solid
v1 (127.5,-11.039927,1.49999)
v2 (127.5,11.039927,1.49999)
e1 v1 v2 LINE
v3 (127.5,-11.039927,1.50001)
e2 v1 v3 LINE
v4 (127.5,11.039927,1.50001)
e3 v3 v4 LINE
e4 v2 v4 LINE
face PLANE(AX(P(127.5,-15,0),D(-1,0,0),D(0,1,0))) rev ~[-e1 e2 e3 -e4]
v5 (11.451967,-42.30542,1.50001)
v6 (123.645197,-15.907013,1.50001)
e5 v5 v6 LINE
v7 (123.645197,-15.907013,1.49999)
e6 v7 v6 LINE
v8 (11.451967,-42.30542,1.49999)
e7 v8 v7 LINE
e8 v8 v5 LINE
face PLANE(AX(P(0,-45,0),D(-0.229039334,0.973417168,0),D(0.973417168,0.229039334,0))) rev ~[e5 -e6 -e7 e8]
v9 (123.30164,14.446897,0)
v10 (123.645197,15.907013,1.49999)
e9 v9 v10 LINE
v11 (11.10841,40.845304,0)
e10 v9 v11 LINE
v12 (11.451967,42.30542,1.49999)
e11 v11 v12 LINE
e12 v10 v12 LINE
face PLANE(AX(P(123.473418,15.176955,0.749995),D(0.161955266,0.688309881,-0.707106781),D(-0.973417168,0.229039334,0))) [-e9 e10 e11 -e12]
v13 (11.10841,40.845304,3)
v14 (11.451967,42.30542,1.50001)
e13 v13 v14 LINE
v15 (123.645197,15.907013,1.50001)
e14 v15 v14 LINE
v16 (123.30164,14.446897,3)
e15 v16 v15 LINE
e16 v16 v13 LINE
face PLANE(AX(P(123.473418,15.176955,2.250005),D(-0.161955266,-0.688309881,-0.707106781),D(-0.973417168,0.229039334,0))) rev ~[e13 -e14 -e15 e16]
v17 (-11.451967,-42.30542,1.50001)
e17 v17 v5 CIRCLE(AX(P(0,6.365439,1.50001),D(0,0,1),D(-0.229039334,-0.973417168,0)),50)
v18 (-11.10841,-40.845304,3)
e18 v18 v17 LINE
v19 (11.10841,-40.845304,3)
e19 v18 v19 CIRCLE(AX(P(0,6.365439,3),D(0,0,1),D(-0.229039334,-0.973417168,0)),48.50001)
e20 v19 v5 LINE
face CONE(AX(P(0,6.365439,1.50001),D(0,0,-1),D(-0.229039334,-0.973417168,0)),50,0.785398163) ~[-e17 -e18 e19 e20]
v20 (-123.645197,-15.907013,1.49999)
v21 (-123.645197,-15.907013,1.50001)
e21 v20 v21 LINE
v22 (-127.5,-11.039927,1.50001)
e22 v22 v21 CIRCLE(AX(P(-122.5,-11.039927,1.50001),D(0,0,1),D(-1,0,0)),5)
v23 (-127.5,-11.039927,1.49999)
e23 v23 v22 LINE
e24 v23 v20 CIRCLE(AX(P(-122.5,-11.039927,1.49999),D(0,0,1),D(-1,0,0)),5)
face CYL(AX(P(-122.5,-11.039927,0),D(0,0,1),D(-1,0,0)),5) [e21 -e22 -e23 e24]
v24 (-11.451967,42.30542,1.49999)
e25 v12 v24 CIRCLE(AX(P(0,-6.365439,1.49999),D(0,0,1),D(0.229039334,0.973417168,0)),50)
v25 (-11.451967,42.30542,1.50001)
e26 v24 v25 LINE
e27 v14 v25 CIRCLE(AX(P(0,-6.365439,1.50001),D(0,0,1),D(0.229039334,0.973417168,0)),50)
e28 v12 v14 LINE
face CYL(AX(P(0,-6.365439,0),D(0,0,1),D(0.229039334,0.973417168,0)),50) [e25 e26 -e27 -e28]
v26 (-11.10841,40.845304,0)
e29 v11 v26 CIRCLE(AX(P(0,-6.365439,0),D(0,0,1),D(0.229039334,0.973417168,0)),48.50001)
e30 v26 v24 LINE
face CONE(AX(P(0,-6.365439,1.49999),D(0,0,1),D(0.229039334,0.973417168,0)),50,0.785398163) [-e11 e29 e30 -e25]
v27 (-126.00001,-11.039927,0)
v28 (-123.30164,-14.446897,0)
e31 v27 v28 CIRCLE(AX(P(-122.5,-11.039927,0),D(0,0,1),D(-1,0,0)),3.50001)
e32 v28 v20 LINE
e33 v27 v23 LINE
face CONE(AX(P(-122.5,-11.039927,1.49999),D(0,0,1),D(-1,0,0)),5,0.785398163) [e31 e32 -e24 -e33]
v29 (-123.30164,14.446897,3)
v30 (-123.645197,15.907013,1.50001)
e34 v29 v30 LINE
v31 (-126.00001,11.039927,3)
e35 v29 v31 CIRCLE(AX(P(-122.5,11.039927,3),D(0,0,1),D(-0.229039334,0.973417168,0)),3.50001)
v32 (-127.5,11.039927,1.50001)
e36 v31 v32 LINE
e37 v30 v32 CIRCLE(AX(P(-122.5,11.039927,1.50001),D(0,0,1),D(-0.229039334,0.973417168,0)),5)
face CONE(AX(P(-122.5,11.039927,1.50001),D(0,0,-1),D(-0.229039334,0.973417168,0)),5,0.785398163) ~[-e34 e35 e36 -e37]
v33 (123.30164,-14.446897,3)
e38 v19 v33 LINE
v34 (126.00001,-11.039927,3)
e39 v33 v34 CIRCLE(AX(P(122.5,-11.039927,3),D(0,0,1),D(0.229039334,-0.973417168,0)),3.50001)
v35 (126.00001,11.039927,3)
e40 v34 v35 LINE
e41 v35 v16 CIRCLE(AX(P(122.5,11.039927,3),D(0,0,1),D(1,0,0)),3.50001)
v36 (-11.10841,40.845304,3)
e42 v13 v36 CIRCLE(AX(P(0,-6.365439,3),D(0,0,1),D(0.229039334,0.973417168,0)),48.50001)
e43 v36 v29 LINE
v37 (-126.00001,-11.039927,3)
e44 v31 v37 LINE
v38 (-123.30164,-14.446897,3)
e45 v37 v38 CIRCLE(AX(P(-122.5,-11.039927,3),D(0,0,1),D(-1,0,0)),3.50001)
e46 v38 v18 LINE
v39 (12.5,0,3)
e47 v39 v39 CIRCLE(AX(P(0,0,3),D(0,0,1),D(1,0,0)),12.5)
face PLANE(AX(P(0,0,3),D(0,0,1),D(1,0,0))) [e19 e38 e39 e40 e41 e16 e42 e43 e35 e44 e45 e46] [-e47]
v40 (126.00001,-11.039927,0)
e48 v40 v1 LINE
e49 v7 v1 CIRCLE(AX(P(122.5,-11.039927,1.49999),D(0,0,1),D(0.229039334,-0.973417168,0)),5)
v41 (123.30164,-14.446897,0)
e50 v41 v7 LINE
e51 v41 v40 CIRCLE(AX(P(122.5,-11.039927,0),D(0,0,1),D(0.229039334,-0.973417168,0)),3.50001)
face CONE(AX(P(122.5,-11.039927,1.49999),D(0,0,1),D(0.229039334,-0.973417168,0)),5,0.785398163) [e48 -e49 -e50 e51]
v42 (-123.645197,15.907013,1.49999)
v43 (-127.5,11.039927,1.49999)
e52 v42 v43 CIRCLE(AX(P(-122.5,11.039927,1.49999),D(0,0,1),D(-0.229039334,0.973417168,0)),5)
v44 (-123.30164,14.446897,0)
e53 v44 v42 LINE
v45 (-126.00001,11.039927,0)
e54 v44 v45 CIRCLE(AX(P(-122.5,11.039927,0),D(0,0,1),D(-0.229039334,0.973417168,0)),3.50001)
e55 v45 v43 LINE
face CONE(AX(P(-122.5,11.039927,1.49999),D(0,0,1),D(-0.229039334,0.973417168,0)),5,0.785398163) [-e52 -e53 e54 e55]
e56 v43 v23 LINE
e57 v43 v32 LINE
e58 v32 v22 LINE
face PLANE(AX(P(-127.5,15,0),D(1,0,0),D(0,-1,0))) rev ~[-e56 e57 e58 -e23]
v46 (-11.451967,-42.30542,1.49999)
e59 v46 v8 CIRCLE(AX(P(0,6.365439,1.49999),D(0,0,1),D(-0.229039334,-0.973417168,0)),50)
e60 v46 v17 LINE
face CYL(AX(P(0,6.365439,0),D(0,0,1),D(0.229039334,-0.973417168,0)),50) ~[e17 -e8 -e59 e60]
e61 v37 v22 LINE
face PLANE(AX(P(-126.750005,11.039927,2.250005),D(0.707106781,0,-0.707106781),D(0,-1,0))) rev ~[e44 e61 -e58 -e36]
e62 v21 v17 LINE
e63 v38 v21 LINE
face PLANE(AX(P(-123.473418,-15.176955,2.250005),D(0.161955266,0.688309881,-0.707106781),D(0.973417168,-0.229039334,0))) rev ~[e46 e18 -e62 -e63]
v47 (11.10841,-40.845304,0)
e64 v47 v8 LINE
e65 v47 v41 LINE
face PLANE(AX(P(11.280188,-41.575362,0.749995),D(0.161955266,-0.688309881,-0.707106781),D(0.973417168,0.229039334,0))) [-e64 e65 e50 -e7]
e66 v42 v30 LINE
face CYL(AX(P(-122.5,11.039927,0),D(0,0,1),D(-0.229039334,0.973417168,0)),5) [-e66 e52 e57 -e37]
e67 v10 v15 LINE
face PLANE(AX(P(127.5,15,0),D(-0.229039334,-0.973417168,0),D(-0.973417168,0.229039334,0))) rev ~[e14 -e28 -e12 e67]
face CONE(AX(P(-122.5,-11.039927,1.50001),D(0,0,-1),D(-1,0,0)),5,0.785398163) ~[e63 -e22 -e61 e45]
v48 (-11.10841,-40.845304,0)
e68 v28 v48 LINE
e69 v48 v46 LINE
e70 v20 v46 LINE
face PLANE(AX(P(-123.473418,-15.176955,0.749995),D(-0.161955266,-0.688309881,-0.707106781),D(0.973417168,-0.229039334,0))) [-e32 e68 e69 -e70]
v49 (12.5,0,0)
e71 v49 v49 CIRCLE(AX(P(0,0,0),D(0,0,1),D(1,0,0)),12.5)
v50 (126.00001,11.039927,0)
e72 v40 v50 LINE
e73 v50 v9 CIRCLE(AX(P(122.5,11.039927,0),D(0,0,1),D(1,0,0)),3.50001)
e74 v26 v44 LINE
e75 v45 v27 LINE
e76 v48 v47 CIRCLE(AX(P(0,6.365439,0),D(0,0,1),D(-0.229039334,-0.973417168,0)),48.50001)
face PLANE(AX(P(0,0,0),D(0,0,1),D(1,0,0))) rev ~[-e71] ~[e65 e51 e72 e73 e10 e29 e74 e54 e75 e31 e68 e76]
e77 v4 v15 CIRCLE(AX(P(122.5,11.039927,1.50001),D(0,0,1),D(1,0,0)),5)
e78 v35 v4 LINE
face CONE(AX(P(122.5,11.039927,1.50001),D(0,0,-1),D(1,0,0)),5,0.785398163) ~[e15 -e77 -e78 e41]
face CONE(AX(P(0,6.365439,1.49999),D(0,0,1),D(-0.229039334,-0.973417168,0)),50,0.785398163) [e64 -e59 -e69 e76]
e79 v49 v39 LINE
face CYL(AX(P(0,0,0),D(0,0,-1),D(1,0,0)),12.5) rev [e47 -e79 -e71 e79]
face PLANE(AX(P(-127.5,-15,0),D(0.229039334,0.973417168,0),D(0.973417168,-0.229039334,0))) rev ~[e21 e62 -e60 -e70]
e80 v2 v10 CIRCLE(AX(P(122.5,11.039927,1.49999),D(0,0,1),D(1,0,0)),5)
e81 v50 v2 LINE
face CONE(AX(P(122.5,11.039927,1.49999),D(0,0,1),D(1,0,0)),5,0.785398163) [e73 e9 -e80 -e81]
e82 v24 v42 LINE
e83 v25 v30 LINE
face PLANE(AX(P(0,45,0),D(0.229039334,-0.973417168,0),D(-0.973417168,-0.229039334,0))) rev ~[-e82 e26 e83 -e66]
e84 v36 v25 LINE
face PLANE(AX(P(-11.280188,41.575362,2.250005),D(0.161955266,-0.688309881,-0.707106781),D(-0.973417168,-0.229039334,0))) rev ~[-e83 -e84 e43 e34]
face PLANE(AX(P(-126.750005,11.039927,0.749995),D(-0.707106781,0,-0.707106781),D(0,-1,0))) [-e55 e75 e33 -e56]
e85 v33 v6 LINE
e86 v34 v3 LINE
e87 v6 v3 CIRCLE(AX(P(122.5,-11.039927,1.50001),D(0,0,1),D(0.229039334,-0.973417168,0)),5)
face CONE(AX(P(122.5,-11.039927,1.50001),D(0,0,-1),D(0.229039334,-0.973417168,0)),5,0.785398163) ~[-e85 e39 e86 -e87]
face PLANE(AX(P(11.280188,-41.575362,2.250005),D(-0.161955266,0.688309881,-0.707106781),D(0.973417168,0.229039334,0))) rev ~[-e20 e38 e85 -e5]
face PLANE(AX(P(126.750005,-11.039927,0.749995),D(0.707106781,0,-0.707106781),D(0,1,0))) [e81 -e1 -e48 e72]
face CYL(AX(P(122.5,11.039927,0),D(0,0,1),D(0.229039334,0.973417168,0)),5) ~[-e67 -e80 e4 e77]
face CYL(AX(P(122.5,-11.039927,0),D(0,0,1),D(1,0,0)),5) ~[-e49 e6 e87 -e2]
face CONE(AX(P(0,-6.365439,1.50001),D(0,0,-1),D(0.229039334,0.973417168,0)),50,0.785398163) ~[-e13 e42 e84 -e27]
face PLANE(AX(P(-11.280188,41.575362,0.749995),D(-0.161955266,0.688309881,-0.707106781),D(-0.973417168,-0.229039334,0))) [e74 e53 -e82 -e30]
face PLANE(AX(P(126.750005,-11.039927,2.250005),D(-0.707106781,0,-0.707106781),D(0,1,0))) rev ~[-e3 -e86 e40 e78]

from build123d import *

# Parameters (mm, degrees)
F0_R     = 12.5
F1_DEPTH = 3
F2_R     = 50
F3_R     = 5
F4_SIZE  = 1.49999


# Not quite as in the source:
# - a fillet or chamfer is up to 0.001 mm smaller than in the source, because OpenCascade refuses the exact size


with BuildPart() as f1:
    # F0 (on Top) → F1 (new body)
    with BuildSketch(Plane.XY):
        Polygon((127.5, 15), (0, 45), (-127.5, 15), (-127.5, -15), (0, -45), (127.5, -15), align=None)
        Circle(F0_R, mode=Mode.SUBTRACT)
    extrude(amount=F1_DEPTH)

    # F2
    f2_edges = [f1.edges().sort_by_distance(p)[0] for p in [
        (0, 45, 1.5),
        (0, -45, 1.5),
    ]]
    fillet(f2_edges, radius=F2_R)

    # F3
    f3_edges = [f1.edges().sort_by_distance(p)[0] for p in [
        (127.5, 15, 1.5),
        (127.5, -15, 1.5),
        (-127.5, 15, 1.5),
        (-127.5, -15, 1.5),
    ]]
    fillet(f3_edges, radius=F3_R)

    # F4 (size 1.5 in the source; OpenCascade refuses exactly that, so slightly less here)
    f4_edges = [f1.edges().sort_by_distance(p)[0] for p in [
        (-67.548582, 29.106216, 3),
        (-67.548582, 29.106216, 0),
    ]]
    chamfer(f4_edges, length=F4_SIZE)


solid = f1.part
